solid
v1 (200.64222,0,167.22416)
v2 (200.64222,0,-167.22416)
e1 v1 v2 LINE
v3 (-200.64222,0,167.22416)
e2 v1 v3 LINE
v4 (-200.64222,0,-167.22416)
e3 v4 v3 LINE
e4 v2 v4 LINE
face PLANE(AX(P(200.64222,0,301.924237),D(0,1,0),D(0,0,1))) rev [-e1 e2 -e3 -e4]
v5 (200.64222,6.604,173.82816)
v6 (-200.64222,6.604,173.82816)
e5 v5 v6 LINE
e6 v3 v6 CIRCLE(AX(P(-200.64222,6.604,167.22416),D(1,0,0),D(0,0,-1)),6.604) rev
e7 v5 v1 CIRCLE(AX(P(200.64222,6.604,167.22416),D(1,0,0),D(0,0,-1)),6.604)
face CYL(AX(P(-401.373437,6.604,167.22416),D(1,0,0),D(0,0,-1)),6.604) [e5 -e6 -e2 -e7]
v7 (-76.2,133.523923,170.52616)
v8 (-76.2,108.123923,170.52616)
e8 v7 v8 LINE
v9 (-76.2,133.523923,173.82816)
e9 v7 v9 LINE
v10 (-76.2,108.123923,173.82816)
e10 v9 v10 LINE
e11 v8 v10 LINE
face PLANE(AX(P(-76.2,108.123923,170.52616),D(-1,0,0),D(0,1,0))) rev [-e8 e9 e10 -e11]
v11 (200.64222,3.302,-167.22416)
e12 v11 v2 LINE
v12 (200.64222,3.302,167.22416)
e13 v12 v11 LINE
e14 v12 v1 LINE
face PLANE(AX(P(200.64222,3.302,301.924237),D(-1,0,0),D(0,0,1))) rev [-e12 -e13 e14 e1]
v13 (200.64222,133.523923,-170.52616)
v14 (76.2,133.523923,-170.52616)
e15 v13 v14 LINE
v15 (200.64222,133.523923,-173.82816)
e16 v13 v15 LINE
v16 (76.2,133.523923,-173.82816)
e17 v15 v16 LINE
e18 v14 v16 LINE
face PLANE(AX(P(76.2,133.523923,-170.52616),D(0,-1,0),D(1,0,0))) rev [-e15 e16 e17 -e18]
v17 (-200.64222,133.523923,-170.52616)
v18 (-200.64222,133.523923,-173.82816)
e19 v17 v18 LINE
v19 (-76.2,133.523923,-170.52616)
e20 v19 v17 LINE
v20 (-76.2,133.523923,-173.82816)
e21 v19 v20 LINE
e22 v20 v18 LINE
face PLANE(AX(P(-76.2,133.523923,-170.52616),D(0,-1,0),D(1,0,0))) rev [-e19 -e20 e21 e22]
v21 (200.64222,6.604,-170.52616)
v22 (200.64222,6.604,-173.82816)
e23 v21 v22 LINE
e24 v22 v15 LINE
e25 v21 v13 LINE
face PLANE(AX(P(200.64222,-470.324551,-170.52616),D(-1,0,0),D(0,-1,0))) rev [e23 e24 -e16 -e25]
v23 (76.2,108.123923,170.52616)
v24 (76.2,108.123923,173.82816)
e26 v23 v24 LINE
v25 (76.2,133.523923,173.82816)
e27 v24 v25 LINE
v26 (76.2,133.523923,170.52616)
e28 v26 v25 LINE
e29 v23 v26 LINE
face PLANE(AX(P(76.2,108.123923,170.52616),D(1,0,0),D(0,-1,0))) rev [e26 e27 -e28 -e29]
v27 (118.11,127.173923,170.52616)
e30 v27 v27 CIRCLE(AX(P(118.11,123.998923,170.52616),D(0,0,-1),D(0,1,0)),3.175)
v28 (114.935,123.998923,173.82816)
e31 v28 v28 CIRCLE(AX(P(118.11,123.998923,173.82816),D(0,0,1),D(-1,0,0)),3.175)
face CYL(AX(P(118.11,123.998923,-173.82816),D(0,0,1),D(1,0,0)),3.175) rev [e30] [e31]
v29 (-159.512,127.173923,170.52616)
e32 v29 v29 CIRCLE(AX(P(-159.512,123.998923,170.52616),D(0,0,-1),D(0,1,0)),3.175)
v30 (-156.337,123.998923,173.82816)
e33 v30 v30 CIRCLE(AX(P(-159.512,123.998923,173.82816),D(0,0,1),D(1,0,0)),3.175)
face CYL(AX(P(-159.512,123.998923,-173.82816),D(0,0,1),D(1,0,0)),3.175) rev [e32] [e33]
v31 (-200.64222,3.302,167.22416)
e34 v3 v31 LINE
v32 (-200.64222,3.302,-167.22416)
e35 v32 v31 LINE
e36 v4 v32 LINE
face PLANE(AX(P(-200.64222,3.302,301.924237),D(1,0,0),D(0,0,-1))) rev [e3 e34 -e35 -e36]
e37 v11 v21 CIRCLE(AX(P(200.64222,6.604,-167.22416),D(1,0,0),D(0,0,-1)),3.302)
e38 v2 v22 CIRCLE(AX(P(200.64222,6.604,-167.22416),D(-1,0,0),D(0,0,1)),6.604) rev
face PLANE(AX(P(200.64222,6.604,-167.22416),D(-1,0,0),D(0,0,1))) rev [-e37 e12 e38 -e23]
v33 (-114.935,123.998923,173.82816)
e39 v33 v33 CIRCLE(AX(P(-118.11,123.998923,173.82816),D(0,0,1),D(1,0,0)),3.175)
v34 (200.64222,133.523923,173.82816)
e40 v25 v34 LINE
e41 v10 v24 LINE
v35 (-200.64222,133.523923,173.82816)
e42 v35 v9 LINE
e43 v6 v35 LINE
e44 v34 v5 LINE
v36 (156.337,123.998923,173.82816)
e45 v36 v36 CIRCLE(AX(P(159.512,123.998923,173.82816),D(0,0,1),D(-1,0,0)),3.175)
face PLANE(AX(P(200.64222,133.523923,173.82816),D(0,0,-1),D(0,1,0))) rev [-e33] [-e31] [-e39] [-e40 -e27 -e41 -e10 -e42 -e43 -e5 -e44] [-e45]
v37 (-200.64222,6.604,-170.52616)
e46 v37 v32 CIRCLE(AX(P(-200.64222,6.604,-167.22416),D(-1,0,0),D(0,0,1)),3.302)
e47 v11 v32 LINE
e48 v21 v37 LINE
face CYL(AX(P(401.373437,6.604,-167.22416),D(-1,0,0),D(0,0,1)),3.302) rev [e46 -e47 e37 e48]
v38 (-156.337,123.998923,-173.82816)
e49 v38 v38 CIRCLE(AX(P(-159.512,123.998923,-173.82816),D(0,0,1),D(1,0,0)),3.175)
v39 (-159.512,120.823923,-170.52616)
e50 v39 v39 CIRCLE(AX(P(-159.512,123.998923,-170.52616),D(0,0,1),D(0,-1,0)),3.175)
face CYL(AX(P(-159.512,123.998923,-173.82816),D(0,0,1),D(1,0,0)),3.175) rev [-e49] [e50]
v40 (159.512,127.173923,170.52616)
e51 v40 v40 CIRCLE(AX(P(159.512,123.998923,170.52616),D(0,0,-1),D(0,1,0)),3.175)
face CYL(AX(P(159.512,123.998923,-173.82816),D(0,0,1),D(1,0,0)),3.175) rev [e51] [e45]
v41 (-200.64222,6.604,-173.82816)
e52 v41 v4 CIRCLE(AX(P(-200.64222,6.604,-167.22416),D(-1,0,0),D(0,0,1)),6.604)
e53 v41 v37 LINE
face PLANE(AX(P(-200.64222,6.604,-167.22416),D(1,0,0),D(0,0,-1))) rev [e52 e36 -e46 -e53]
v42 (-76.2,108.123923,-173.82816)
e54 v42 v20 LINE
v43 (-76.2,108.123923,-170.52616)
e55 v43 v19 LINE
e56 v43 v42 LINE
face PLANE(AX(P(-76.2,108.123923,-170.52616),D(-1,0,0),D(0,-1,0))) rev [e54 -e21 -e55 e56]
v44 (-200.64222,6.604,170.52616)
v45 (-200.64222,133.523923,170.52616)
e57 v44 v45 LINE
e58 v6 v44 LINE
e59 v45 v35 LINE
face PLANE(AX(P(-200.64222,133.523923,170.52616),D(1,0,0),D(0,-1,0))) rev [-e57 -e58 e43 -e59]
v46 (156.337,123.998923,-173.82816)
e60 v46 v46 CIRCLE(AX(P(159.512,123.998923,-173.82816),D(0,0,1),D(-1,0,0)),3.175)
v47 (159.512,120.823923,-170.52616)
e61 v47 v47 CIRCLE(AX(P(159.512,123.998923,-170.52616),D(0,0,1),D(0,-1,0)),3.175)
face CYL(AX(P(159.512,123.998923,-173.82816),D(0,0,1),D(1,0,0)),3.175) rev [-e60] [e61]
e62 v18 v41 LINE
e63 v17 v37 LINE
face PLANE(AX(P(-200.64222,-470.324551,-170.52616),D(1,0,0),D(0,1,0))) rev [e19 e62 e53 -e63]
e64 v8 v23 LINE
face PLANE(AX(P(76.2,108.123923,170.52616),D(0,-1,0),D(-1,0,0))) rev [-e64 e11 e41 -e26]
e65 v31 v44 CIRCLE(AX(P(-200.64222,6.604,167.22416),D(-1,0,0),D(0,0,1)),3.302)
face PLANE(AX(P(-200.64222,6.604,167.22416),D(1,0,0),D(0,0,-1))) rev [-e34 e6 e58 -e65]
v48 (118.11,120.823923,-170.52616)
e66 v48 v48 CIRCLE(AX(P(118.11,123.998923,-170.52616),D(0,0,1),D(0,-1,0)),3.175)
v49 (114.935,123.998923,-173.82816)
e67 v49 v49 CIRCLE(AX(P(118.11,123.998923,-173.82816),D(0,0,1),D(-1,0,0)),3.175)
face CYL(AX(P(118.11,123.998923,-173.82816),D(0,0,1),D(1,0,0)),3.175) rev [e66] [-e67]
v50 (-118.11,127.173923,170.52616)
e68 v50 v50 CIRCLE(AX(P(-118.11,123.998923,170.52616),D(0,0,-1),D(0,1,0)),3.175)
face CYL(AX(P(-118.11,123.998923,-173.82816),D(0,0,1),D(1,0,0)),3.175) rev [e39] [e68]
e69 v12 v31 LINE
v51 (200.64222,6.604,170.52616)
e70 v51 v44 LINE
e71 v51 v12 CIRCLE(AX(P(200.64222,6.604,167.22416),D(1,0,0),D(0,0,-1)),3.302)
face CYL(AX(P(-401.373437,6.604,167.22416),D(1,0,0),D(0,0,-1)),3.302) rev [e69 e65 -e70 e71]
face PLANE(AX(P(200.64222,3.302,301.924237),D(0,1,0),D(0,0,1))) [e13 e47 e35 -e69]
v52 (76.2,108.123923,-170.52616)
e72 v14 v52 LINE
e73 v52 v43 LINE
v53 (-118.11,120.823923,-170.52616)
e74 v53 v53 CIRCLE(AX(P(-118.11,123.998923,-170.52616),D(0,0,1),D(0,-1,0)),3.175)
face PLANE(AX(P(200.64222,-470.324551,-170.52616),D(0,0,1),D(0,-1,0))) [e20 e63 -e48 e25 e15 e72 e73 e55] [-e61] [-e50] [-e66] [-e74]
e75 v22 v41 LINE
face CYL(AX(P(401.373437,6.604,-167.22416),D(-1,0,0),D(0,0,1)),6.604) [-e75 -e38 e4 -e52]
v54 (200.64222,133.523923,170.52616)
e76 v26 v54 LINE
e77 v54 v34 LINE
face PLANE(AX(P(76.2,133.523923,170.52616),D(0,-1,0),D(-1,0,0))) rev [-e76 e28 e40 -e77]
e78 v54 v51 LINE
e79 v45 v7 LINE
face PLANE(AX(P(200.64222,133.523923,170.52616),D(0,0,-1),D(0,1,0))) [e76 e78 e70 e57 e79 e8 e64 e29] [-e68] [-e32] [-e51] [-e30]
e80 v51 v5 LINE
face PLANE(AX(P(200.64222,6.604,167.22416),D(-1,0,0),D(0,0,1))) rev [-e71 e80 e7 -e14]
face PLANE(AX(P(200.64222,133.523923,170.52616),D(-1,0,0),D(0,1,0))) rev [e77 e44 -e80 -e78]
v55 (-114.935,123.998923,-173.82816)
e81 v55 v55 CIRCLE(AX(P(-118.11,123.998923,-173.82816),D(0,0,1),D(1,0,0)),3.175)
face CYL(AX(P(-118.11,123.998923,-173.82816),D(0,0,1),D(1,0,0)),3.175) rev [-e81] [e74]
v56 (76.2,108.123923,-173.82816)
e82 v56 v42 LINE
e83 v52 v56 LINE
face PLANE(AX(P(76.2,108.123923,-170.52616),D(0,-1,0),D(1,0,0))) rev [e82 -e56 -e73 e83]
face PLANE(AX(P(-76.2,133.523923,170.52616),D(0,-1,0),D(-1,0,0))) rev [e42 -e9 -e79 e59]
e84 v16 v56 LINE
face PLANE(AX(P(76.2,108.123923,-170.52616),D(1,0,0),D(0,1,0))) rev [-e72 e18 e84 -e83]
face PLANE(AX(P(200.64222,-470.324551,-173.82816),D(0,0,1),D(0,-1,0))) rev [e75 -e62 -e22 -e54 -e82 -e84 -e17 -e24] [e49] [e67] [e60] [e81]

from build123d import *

# Parameters (mm, degrees)
BASE_FLANGE1_DEPTH         = 3.302
SKETCHED_START             = -200.64222
SKETCHED_BEND1_DEPTH       = 401.28444
SKETCHED_BEND1_2_DEPTH     = 401.28444
SKETCHED_BEND1_3_OUTLINE_W = 25.4
SKETCHED_BEND1_3_OUTLINE_H = 3.302
SKETCHED_BEND1_3_DEPTH     = 124.44222
SKETCHED_START_2           = 76.2
SKETCHED_BEND1_4_OUTLINE_W = 25.4
SKETCHED_BEND1_4_OUTLINE_H = 3.302
SKETCHED_BEND1_4_DEPTH     = 124.44222
SKETCH15_R                 = 3.175
EXTRUDE2_DEPTH             = 424.025832199


# Read off the part's stored shape, not the designer's step: Sketched Bend1
# Sheet-metal steps are written as plain solids
with BuildPart() as part:
    # Sketch2 → Base-Flange1 (new body)
    with BuildSketch(Plane(origin=(0, 0, 0), x_dir=(1, 0, 0), z_dir=(0, 1, 0))):
        Polygon((200.64222, -301.9242367), (200.64222, 301.9242367), (76.2, 301.9242367), (76.2, 276.5242367), (-76.2, 276.5242367), (-76.2, 301.9242367), (-200.64222, 301.9242367), (-200.64222, -301.9242367), (-76.2, -301.9242367), (-76.2, -276.5242367), (76.2, -276.5242367), (76.2, -301.9242367), align=None)
    extrude(amount=BASE_FLANGE1_DEPTH)

    # Sketched Bend1 outline → Sketched Bend1 (cut)
    with BuildSketch(Plane.YZ.offset(SKETCHED_START)):
        with BuildLine():
            ThreePointArc((0, 167.224159597), (0.884768233, 170.526159597), (3.302, 172.943391364))
            Line((3.302, 172.943391364), (3.302, 301.9242367))
            Line((3.302, 301.9242367), (0, 301.9242367))
            Line((0, 301.9242367), (0, 167.224159597))
        make_face()
        with BuildLine():
            ThreePointArc((3.302, -172.943391364), (0.884768233, -170.526159597), (0, -167.224159597))
            Line((0, -167.224159597), (0, -301.9242367))
            Line((0, -301.9242367), (3.302, -301.9242367))
            Line((3.302, -301.9242367), (3.302, -172.943391364))
        make_face()
    extrude(amount=SKETCHED_BEND1_DEPTH, mode=Mode.SUBTRACT)

    # Sketched Bend1 2 outline → Sketched Bend1 2 (add)
    with BuildSketch(Plane.YZ.offset(SKETCHED_START)):
        with BuildLine():
            ThreePointArc((3.302, 167.224159597), (4.269133409, 169.559026188), (6.604, 170.526159597))
            Line((6.604, 170.526159597), (108.123922897, 170.526159597))
            Line((108.123922897, 170.526159597), (108.123922897, 173.828159597))
            Line((108.123922897, 173.828159597), (6.604, 173.828159597))
            ThreePointArc((6.604, 173.828159597), (4.894759026, 173.603133754), (3.302, 172.943391364))
            Line((3.302, 172.943391364), (3.302, 167.224159597))
        make_face()
        with BuildLine():
            ThreePointArc((6.604, -170.526159597), (4.269133409, -169.559026188), (3.302, -167.224159597))
            Line((3.302, -167.224159597), (3.302, -172.943391364))
            ThreePointArc((3.302, -172.943391364), (4.894759026, -173.603133754), (6.604, -173.828159597))
            Line((6.604, -173.828159597), (108.123922897, -173.828159597))
            Line((108.123922897, -173.828159597), (108.123922897, -170.526159597))
            Line((108.123922897, -170.526159597), (6.604, -170.526159597))
        make_face()
    extrude(amount=SKETCHED_BEND1_2_DEPTH)

    # Sketched Bend1 3 outline → Sketched Bend1 3 (add)
    with BuildSketch(Plane.YZ.offset(SKETCHED_START)):
        with Locations((120.823922897, 172.177159597)):
            Rectangle(SKETCHED_BEND1_3_OUTLINE_W, SKETCHED_BEND1_3_OUTLINE_H)
        with Locations((120.823922897, -172.177159597)):
            Rectangle(SKETCHED_BEND1_3_OUTLINE_W, SKETCHED_BEND1_3_OUTLINE_H)
    extrude(amount=SKETCHED_BEND1_3_DEPTH)

    # Sketched Bend1 4 outline → Sketched Bend1 4 (add)
    with BuildSketch(Plane.YZ.offset(SKETCHED_START_2)):
        with Locations((120.823922897, 172.177159597)):
            Rectangle(SKETCHED_BEND1_4_OUTLINE_W, SKETCHED_BEND1_4_OUTLINE_H)
        with Locations((120.823922897, -172.177159597)):
            Rectangle(SKETCHED_BEND1_4_OUTLINE_W, SKETCHED_BEND1_4_OUTLINE_H)
    extrude(amount=SKETCHED_BEND1_4_DEPTH)

    # Sketch15 → Extrude2 (cut, through all)
    with BuildSketch(Plane.XY.offset(173.828159597)):
        with Locations((-159.512, 123.998922897)):
            Circle(SKETCH15_R)
        with Locations((-118.11, 123.998922897)):
            Circle(SKETCH15_R)
        with Locations(Location((118.11, 123.998922897, 0), (0, 0, 270))):
            Circle(SKETCH15_R)
        with Locations(Location((159.512, 123.998922897, 0), (0, 0, 270))):
            Circle(SKETCH15_R)
    extrude(amount=-EXTRUDE2_DEPTH, mode=Mode.SUBTRACT)


solid = part.part
